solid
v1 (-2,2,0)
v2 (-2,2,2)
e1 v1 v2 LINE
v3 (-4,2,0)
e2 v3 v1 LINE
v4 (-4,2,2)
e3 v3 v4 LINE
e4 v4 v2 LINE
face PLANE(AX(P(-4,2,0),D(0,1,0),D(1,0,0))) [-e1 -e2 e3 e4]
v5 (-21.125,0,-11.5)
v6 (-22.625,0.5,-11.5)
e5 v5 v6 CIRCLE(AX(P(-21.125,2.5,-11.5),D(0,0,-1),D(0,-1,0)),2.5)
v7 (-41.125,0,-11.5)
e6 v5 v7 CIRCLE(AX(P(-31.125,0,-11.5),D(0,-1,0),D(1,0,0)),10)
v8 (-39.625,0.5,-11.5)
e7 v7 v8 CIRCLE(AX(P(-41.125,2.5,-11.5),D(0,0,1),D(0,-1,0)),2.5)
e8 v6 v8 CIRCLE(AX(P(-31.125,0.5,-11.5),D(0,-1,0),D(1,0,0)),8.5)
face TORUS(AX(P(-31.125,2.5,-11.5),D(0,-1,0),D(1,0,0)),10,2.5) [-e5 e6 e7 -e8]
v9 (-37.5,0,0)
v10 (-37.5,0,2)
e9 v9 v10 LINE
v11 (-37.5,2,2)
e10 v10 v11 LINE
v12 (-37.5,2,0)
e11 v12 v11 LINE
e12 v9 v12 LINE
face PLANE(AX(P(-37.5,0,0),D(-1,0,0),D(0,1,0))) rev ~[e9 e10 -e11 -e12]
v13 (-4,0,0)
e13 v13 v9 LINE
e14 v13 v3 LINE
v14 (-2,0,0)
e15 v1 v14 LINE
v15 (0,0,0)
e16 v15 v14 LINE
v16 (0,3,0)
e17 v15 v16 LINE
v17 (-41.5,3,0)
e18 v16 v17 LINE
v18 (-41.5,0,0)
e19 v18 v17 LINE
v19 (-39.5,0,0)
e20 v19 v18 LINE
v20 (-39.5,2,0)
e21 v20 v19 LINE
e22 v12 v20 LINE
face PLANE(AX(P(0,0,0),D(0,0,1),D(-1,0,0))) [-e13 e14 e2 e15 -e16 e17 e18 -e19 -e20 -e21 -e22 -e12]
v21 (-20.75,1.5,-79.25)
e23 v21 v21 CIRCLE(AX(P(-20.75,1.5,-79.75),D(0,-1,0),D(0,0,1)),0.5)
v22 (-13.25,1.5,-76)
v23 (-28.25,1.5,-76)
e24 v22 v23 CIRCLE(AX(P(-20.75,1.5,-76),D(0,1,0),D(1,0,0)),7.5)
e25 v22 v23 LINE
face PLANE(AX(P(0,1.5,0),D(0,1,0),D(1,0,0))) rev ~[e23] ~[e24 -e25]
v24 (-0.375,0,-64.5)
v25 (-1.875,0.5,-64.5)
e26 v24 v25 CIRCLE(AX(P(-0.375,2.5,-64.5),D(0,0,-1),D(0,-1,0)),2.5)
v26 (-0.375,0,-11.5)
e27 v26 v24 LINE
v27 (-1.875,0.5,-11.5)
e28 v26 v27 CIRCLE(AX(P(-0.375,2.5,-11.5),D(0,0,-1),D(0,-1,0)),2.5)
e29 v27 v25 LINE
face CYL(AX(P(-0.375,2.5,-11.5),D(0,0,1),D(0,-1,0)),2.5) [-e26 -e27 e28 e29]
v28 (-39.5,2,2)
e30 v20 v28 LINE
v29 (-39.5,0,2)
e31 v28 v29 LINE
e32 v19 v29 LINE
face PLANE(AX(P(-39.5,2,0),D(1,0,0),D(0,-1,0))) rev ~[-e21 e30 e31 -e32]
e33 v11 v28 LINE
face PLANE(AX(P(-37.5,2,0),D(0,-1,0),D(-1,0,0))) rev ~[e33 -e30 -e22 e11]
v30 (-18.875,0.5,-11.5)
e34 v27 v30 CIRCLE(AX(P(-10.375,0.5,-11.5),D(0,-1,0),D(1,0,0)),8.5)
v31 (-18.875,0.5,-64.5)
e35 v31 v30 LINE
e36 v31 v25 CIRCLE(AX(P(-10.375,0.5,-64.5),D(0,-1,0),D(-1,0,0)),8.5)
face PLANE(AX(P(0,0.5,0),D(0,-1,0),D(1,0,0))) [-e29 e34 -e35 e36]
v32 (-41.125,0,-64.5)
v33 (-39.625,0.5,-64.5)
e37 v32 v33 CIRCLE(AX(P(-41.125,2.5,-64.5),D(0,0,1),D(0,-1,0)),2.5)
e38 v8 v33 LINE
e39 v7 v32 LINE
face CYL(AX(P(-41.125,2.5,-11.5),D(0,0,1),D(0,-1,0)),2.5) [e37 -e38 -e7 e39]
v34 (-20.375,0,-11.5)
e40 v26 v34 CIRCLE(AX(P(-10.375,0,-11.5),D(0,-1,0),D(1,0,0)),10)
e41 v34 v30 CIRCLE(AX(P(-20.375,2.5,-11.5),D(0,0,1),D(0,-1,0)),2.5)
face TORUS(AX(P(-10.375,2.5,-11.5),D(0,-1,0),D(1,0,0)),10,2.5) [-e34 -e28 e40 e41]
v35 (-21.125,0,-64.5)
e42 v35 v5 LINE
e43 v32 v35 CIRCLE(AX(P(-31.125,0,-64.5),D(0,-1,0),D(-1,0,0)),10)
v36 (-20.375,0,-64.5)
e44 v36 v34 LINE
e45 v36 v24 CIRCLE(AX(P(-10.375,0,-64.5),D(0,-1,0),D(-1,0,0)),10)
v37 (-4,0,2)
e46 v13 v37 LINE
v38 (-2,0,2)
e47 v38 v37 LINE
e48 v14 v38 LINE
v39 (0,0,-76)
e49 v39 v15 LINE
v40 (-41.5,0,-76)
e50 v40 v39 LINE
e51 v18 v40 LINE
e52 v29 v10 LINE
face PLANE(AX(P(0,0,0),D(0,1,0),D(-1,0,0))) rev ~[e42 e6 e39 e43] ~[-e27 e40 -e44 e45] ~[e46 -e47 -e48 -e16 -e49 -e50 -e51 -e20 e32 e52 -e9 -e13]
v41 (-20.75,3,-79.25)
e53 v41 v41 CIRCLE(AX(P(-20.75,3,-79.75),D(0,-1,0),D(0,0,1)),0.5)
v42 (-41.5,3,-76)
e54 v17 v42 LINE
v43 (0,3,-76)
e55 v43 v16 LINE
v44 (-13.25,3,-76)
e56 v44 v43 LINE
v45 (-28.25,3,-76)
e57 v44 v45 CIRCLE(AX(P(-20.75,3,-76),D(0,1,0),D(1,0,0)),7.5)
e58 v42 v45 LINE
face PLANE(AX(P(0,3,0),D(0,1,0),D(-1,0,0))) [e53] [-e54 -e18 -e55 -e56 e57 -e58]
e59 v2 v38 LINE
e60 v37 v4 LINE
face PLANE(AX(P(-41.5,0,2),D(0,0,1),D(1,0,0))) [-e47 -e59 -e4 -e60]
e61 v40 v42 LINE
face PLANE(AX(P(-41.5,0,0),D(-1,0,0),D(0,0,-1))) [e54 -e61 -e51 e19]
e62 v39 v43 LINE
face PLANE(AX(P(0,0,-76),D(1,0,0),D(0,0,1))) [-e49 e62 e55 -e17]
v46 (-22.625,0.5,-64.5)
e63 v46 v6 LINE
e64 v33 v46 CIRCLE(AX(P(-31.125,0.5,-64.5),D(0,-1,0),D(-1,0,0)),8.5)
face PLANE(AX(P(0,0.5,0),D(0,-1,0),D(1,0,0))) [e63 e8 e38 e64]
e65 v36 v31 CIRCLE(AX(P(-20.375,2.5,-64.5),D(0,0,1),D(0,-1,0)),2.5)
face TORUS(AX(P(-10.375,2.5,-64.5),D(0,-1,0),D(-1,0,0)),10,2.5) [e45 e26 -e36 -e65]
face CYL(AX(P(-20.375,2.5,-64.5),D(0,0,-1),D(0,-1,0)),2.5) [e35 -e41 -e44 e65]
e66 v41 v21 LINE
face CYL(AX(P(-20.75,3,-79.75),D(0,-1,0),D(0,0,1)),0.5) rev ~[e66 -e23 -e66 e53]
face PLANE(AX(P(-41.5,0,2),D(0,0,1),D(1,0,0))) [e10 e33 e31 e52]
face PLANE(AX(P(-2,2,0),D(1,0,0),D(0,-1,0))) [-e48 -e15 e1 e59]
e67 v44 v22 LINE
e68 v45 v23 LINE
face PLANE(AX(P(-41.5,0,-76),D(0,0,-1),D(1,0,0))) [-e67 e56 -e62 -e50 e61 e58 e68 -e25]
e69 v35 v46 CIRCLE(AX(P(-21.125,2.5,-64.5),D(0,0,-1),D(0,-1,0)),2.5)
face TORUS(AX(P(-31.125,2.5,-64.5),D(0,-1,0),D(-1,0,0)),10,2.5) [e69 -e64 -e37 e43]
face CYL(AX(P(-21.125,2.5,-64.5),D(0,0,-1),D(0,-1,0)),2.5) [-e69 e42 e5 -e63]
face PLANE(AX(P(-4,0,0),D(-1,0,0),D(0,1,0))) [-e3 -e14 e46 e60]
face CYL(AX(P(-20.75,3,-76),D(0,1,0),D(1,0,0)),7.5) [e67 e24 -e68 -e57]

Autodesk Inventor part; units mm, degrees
ref_plane "YZ Plane" through (0, 0, 0) normal (1, 0, 0) x (0, 1, 0)
ref_plane "XZ Plane" through (0, 0, 0) normal (0, 1, 0) x (-1, 0, 0)
ref_plane "XY Plane" through (0, 0, 0) normal (0, 0, 1) x (1, 0, 0)
sketch "Sketch1" plane through (0, 0, 0) normal (0, 1, 0) x (-1, 0, 0)
  line L0 (0, 0) -> (41.5, 0)
  line L1 (41.5, 0) -> (41.5, -76)
  line L2 (41.5, -76) -> (0, -76)
  line L3 (0, -76) -> (0, 0)
  dimension "d0" = 41.5
  dimension "d1" = 76
extrude "Extrusion1" add sketch "Sketch1" along normal blind 3
sketch "Sketch2" plane through (-41.5, 0, 0) normal (0, 0, 1) x (1, 0, 0)
  line L0 (41.5, 0) -> (0, 0) construction
  line L1 (0, 0) -> (2, 0) construction
  line L2 (41.5, 0) -> (41.5, 3) construction
  line L3 (41.5, 0) -> (39.5, 0) construction
  line L4 (2, 0) -> (4, 0)
  line L5 (4, 0) -> (4, 2)
  line L6 (4, 2) -> (2, 2)
  line L7 (2, 2) -> (2, 0)
  line L8 (39.5, 0) -> (37.5, 0)
  line L9 (37.5, 0) -> (37.5, 2)
  line L10 (37.5, 2) -> (39.5, 2)
  line L11 (39.5, 2) -> (39.5, 0)
  dimension "d4" = 2
  dimension "d5" = 2
  dimension "d6" = 2
  dimension "d7" = 2
  dimension "d8" = 2
  dimension "d9" = 2
extrude "Extrusion2" add sketch "Sketch2" along normal blind 2
sketch "Sketch3" plane through (0, 3, 0) normal (0, 1, 0) x (1, 0, 0)
  line L0 (0, 76) -> (-41.5, 76) projected
  circle A0 centre (-20.75, 76) radius 7.5
  point P0 (0, 0)
  point P1 (-28.25, 76)
  point P2 (-13.25, 76)
  dimension "d12" = 15
extrude "Extrusion3" add sketch "Sketch3" against normal blind 1.5 contours L0 A0 picked at (-18.3226, 76.5983)
sketch "Sketch4" plane through (0, 3, 0) normal (0, 1, 0) x (1, 0, 0)
  line L0 (-28.25, 76) -> (-13.25, 76) construction
  line L1 (-20.75, 76) -> (-20.75, 79.75) construction
  point P0 (0, 0)
  dimension "d15" = 3.75
hole "Hole1" at (-20.75, 3, -79.75) direction (0, -1, 0) diameter 1 depth 2 tip angle 118
sketch "Sketch5" plane through (0, 0, 0) normal (0, -1, 0) x (1, 0, 0)
  line L0 (-28.25, -76) -> (-13.25, -76) construction
  line L1 (-20.75, -76) -> (-20.75, 0) construction
  line L2 (-41.5, 0) -> (0, 0) construction
  line L3 (-41.5, -76) -> (-41.5, 0) construction
  line L4 (-41.5, -76) -> (-20.75, 0) construction
  line L5 (-41.5, 0) -> (-20.75, -76) construction
  line L6 (-28.25, -76) -> (-41.5, -76) construction
  line L7 (-31.125, -76) -> (-31.125, -73) construction
  line L8 (-31.125, 0) -> (-31.125, -3) construction
  line L9 (-31.125, -73) -> (-31.125, -3) construction
  line L10 (-22.625, -64.5) -> (-22.625, -11.5)
  line L11 (-39.625, -11.5) -> (-39.625, -64.5)
  arc A0 (-39.625, -64.5) -> (-22.625, -64.5) centre (-31.125, -64.5) ccw
  arc A1 (-22.625, -11.5) -> (-39.625, -11.5) centre (-31.125, -11.5) ccw
  line L12 (-18.875, -64.5) -> (-18.875, -11.5)
  line L13 (-1.875, -11.5) -> (-1.875, -64.5)
  arc A2 (-18.875, -64.5) -> (-1.875, -64.5) centre (-10.375, -64.5) ccw
  arc A3 (-1.875, -11.5) -> (-18.875, -11.5) centre (-10.375, -11.5) ccw
  point P0 (-31.125, -38)
  dimension "d23" = 3
  dimension "d24" = 3
  dimension "d25" = 17
extrude "Extrusion4" cut sketch "Sketch5" against normal blind 0.5
fillet "Fillet1" radius 2.5 8 edges at (-31.125, 0, -73) (-39.625, 0, -38) (-31.125, 0, -3) (-22.625, 0, -38) (-10.375, 0, -3) (-1.875, 0, -38) (-10.375, 0, -73) (-18.875, 0, -38)
properties part number "tapa pila"
